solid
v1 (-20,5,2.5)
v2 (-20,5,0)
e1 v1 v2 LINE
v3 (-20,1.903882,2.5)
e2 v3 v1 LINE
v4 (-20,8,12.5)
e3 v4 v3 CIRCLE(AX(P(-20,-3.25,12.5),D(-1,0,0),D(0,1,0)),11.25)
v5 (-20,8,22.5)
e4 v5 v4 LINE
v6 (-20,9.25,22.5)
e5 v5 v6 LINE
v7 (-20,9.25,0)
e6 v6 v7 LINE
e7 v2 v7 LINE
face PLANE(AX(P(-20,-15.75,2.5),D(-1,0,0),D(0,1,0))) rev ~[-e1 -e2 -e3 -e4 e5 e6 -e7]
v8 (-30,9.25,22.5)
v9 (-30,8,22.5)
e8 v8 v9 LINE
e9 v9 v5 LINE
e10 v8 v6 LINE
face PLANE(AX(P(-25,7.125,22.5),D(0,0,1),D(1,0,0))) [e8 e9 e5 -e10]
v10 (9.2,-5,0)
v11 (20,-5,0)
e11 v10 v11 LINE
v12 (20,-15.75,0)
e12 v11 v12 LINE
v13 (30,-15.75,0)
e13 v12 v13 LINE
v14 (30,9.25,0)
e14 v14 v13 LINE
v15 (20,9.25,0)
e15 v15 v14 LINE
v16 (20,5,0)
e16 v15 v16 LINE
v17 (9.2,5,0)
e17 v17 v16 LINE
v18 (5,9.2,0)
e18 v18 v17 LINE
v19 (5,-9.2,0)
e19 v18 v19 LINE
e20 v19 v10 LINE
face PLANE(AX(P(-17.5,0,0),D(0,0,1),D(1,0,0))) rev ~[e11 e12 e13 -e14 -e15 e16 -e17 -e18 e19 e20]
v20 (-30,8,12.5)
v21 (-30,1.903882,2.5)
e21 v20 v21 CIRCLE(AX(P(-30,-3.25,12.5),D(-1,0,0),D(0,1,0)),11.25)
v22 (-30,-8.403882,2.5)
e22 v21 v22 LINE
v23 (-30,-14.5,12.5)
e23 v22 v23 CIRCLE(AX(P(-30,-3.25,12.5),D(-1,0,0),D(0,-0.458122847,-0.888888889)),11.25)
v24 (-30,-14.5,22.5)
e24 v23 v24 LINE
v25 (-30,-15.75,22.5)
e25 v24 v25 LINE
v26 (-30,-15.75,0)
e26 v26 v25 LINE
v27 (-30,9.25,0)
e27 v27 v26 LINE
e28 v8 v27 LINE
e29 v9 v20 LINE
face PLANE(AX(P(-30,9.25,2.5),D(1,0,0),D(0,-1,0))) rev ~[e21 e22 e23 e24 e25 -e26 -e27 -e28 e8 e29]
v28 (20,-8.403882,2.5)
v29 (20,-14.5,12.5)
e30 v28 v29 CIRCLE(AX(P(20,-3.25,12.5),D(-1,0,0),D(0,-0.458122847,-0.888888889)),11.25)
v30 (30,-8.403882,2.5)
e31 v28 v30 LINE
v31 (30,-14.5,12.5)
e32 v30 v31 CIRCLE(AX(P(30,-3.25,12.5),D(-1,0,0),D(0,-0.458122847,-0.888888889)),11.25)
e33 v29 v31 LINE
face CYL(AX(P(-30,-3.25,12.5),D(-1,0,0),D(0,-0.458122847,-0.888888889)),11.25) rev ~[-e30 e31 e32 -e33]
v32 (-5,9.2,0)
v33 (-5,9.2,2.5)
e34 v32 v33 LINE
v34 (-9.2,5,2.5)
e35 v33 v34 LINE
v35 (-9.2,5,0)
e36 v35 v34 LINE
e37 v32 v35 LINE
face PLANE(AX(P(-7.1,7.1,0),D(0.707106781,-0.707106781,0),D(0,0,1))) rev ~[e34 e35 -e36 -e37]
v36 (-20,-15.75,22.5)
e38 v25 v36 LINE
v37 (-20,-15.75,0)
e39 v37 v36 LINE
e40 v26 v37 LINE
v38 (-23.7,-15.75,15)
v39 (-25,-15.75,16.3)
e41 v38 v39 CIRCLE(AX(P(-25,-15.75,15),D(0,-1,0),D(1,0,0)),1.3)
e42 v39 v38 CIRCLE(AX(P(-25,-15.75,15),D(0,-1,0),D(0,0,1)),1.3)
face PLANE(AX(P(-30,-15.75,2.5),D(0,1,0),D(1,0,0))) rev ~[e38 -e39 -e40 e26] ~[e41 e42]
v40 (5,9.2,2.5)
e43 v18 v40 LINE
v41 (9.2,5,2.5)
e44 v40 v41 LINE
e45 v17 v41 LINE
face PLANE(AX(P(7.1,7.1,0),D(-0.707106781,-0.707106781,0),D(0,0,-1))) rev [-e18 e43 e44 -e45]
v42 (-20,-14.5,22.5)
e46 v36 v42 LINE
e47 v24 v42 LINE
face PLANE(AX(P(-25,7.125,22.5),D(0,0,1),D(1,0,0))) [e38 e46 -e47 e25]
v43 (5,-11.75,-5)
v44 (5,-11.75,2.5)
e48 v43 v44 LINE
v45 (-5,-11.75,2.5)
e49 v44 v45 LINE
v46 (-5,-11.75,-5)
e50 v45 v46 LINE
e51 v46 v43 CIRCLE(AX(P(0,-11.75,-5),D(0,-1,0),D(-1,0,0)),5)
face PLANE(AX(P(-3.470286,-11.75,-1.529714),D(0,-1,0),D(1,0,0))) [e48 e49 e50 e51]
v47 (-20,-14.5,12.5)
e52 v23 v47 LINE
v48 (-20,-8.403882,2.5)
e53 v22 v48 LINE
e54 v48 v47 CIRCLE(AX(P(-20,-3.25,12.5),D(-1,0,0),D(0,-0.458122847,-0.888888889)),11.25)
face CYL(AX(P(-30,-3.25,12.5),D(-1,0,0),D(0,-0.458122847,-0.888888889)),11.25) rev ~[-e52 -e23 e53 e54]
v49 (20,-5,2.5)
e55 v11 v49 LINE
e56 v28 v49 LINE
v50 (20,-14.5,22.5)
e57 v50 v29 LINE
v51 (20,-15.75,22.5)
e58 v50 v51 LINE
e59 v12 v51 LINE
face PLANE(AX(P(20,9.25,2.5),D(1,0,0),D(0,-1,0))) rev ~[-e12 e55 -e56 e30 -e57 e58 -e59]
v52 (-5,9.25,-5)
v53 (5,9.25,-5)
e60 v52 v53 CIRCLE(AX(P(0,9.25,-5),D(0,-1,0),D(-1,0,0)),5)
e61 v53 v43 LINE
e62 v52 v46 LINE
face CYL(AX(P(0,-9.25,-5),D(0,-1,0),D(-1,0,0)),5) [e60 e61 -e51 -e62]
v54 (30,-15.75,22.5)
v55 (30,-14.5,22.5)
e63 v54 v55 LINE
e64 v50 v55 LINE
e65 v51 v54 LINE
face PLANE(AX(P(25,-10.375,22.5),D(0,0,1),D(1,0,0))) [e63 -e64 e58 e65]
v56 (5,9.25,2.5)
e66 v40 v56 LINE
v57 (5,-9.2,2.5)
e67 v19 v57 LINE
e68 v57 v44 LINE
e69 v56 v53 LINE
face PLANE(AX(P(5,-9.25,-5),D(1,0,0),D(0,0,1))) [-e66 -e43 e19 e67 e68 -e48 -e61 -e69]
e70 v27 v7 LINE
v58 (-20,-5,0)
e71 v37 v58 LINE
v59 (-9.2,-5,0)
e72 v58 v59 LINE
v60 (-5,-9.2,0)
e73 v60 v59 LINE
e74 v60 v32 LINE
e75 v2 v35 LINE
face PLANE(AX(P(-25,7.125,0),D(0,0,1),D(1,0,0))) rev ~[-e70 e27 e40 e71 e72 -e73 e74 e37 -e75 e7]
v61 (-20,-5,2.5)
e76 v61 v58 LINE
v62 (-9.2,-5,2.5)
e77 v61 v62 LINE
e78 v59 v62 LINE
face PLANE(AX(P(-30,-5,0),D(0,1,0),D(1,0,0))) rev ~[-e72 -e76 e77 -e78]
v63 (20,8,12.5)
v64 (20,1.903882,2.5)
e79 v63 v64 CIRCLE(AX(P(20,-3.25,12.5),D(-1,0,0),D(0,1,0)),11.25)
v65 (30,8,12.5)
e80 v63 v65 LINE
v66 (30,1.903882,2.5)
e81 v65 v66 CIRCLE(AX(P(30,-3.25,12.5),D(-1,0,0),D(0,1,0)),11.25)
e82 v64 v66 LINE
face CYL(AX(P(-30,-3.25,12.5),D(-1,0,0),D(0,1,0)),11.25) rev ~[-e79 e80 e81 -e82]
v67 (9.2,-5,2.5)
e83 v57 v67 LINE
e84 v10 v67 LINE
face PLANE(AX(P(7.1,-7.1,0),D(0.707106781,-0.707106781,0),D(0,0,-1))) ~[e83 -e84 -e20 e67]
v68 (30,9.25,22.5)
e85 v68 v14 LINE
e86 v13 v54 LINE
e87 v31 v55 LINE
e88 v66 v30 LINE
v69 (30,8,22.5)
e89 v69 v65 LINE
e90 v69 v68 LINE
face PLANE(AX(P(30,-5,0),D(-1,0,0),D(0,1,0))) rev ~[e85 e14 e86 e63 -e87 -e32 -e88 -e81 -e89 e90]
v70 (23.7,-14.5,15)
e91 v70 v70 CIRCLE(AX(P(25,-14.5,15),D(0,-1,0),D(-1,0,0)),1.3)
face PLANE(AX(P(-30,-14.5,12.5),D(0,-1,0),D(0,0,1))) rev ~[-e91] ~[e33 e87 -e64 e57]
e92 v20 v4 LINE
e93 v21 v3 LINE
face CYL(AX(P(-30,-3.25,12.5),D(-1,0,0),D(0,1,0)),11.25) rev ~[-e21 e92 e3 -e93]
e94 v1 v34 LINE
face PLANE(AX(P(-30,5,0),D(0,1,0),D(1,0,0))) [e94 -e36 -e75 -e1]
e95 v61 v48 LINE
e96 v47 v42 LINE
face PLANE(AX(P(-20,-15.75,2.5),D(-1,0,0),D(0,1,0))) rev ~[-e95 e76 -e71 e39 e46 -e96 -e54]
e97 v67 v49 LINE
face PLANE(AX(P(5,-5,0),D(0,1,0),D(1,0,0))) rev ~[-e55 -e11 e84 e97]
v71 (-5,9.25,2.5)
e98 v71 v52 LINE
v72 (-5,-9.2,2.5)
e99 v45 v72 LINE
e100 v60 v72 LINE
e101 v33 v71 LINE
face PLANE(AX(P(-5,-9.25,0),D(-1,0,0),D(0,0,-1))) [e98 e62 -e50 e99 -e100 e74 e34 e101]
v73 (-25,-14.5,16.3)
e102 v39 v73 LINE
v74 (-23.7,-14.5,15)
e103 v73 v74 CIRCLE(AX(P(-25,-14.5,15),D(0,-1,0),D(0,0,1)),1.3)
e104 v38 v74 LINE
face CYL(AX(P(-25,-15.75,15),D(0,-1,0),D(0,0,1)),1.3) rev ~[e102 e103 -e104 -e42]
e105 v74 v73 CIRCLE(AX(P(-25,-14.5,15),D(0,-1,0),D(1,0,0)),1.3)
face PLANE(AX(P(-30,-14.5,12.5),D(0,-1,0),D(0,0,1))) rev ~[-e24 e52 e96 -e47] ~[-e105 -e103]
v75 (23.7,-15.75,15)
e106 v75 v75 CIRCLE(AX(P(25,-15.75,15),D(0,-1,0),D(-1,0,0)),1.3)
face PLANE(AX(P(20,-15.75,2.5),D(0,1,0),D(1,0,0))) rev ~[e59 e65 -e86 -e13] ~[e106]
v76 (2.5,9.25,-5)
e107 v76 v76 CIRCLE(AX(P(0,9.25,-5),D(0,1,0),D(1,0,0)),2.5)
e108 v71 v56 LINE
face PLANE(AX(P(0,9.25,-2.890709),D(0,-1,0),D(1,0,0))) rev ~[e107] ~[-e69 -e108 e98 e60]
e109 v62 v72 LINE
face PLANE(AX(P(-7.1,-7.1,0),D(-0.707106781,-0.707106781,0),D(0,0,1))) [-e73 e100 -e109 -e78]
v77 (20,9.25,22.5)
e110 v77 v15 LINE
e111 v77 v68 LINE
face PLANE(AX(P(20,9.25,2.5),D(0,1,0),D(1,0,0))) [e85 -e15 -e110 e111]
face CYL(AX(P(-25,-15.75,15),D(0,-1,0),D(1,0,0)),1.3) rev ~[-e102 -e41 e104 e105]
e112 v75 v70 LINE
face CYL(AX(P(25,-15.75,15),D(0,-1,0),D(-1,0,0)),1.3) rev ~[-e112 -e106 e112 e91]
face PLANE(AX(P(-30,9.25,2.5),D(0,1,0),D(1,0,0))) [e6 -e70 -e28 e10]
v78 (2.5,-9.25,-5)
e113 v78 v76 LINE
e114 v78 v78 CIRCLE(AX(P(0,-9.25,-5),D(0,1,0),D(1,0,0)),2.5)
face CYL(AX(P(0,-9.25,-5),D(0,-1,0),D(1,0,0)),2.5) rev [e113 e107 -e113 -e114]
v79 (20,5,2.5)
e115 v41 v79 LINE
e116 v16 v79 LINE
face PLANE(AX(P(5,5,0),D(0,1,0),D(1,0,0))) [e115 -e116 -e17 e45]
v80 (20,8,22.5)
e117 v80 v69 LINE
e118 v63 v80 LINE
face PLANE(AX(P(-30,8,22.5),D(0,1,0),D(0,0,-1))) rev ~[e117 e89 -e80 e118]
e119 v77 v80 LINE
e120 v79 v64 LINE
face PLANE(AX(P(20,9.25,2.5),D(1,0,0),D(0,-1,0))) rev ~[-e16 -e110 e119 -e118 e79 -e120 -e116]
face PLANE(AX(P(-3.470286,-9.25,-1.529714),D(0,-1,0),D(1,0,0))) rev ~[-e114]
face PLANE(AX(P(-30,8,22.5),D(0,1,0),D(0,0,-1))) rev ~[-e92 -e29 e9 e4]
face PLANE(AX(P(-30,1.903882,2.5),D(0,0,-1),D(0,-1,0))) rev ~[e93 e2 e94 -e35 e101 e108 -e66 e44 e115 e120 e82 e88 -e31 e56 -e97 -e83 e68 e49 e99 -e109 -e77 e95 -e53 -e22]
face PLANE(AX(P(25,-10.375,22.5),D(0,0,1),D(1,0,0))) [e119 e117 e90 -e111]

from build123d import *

# Parameters (mm, degrees)
F0_W      = 25
F0_H      = 10
F0_W_2    = 10
F0_H_2    = 4.25
F1_DEPTH  = 2.5
F3_DEPTH  = 2.5
F4_DEPTH  = 18.5
F5_SIZE   = 4.2
F6_W      = 10
F6_H      = 4.25
F6_H_2    = 10
F6_H_3    = 10.75
F7_DEPTH  = 2.5
F8_DEPTH  = 20
F10_DEPTH = 60
F12_DEPTH = 10


with BuildPart() as f1:
    # F0 (on Top) → F1 (new body)
    with BuildSketch(Plane.XY):
        with Locations((-17.5, 0)):
            Rectangle(F0_W, F0_H)
        with Locations((0, 7.125)):
            Rectangle(F0_W_2, F0_H_2)
        Rectangle(F0_W_2, F0_H)
        with Locations((0, -7.125)):
            Rectangle(F0_W_2, F0_H_2)
        with Locations((17.5, 0)):
            Rectangle(F0_W, F0_H)
    extrude(amount=F1_DEPTH)

    # F2 (on face) → F3 (join)
    with BuildSketch(Plane.XZ.offset(9.25)):
        with BuildLine():
            Line((0, 0), (-5, 0))
            Line((-5, 0), (-5, -5))
            ThreePointArc((-5, -5), (-3.5355339059, -1.4644660941), (0, 0))
        make_face()
        with BuildLine():
            Line((5, 0), (0, 0))
            ThreePointArc((0, 0), (3.5355339059, -1.4644660941), (5, -5))
            Line((5, -5), (5, 0))
        make_face()
        with BuildLine():
            ThreePointArc((5, -5), (3.5355339059, -1.4644660941), (0, 0))
            ThreePointArc((0, 0), (-3.5355339059, -1.4644660941), (-5, -5))
            Line((-5, -5), (-2.5, -5))
            ThreePointArc((-2.5, -5), (0, -2.5), (2.5, -5))
            Line((2.5, -5), (5, -5))
        make_face()
        with BuildLine():
            Line((-2.5, -5), (-5, -5))
            ThreePointArc((-5, -5), (0, -10), (5, -5))
            Line((5, -5), (2.5, -5))
            ThreePointArc((2.5, -5), (0, -7.5), (-2.5, -5))
        make_face()
        with BuildLine():
            Line((2.5, -5), (-2.5, -5))
            ThreePointArc((-2.5, -5), (0, -7.5), (2.5, -5))
        make_face()
        with BuildLine():
            ThreePointArc((2.5, -5), (0, -2.5), (-2.5, -5))
            Line((-2.5, -5), (2.5, -5))
        make_face()
        Polygon((-5, 2.5), (-5, 0), (0, 0), (5, 0), (5, 2.5), align=None)
    extrude(amount=F3_DEPTH)

    # F2 (on face) → F4 (join)
    with BuildSketch(Plane.XZ.offset(9.25)):
        with BuildLine():
            ThreePointArc((5, -5), (3.5355339059, -1.4644660941), (0, 0))
            ThreePointArc((0, 0), (-3.5355339059, -1.4644660941), (-5, -5))
            Line((-5, -5), (-2.5, -5))
            ThreePointArc((-2.5, -5), (0, -2.5), (2.5, -5))
            Line((2.5, -5), (5, -5))
        make_face()
        with BuildLine():
            Line((-2.5, -5), (-5, -5))
            ThreePointArc((-5, -5), (0, -10), (5, -5))
            Line((5, -5), (2.5, -5))
            ThreePointArc((2.5, -5), (0, -7.5), (-2.5, -5))
        make_face()
        with BuildLine():
            Line((0, 0), (-5, 0))
            Line((-5, 0), (-5, -5))
            ThreePointArc((-5, -5), (-3.5355339059, -1.4644660941), (0, 0))
        make_face()
        with BuildLine():
            Line((5, 0), (0, 0))
            ThreePointArc((0, 0), (3.5355339059, -1.4644660941), (5, -5))
            Line((5, -5), (5, 0))
        make_face()
    extrude(amount=-F4_DEPTH)

    # F5
    f5_edges = [f1.edges().sort_by_distance(p)[0] for p in [
        (-5, 5, 1.25),
        (-5, -5, 1.25),
        (5, 5, 1.25),
        (5, -5, 1.25),
    ]]
    chamfer(f5_edges, length=F5_SIZE)

    # F6 (on face) → F7 (join)
    with BuildSketch(Plane.XY.offset(2.5)):
        with Locations((-25, 7.125)):
            Rectangle(F6_W, F6_H)
        with Locations((-25, 0)):
            Rectangle(F6_W, F6_H_2)
        with Locations((-25, -10.375)):
            Rectangle(F6_W, F6_H_3)
        with Locations((25, 7.125)):
            Rectangle(F6_W, F6_H)
        with Locations((25, 0)):
            Rectangle(F6_W, F6_H_2)
        with Locations((25, -10.375)):
            Rectangle(F6_W, F6_H_3)
    extrude(amount=-F7_DEPTH)

    # F6 (on face) → F8 (join)
    with BuildSketch(Plane.XY.offset(2.5)):
        with Locations((-25, 7.125)):
            Rectangle(F6_W, F6_H)
        with Locations((-25, 0)):
            Rectangle(F6_W, F6_H_2)
        with Locations((-25, -10.375)):
            Rectangle(F6_W, F6_H_3)
        with Locations((25, -10.375)):
            Rectangle(F6_W, F6_H_3)
        with Locations((25, 0)):
            Rectangle(F6_W, F6_H_2)
        with Locations((25, 7.125)):
            Rectangle(F6_W, F6_H)
    extrude(amount=F8_DEPTH)

    # F9 (on face) → F10 (cut)
    with BuildSketch(Plane(origin=(-30, 0, 0), x_dir=(0, -1, 0), z_dir=(-1, 0, 0))):
        with BuildLine():
            ThreePointArc((8.403882032, 2.5), (12.855823048, 6.644176952), (14.5, 12.5))
            ThreePointArc((14.5, 12.5), (12.855823048, 18.355823048), (8.403882032, 22.5))
            Line((8.403882032, 22.5), (3.25, 22.5))
            Line((3.25, 22.5), (-1.903882032, 22.5))
            ThreePointArc((-1.903882032, 22.5), (-6.355823048, 18.355823048), (-8, 12.5))
            ThreePointArc((-8, 12.5), (-6.355823048, 6.644176952), (-1.903882032, 2.5))
            Line((-1.903882032, 2.5), (8.403882032, 2.5))
        make_face()
        with BuildLine():
            ThreePointArc((8.403882032, 22.5), (12.855823048, 18.355823048), (14.5, 12.5))
            Line((14.5, 12.5), (14.5, 22.5))
            Line((14.5, 22.5), (8.403882032, 22.5))
        make_face()
        with BuildLine():
            ThreePointArc((-8, 12.5), (-6.355823048, 18.355823048), (-1.903882032, 22.5))
            Line((-1.903882032, 22.5), (-8, 22.5))
            Line((-8, 22.5), (-8, 12.5))
        make_face()
    extrude(amount=-F10_DEPTH, mode=Mode.SUBTRACT)

    # F11 (on face) → F12 (cut)
    with BuildSketch(Plane.XZ.offset(15.75)):
        with BuildLine():
            Line((-25, 15), (-25, 16.3))
            ThreePointArc((-25, 16.3), (-25.9192388155, 14.0807611845), (-23.7, 15))
            Line((-23.7, 15), (-25, 15))
        make_face()
        with BuildLine():
            ThreePointArc((-23.7, 15), (-24.0807611845, 15.9192388155), (-25, 16.3))
            Line((-25, 16.3), (-25, 15))
            Line((-25, 15), (-23.7, 15))
        make_face()
        with BuildLine():
            ThreePointArc((26.3, 15), (25, 16.3), (23.7, 15))
            ThreePointArc((23.7, 15), (25, 13.7), (26.3, 15))
        make_face()
    extrude(amount=-F12_DEPTH, mode=Mode.SUBTRACT)


solid = f1.part
